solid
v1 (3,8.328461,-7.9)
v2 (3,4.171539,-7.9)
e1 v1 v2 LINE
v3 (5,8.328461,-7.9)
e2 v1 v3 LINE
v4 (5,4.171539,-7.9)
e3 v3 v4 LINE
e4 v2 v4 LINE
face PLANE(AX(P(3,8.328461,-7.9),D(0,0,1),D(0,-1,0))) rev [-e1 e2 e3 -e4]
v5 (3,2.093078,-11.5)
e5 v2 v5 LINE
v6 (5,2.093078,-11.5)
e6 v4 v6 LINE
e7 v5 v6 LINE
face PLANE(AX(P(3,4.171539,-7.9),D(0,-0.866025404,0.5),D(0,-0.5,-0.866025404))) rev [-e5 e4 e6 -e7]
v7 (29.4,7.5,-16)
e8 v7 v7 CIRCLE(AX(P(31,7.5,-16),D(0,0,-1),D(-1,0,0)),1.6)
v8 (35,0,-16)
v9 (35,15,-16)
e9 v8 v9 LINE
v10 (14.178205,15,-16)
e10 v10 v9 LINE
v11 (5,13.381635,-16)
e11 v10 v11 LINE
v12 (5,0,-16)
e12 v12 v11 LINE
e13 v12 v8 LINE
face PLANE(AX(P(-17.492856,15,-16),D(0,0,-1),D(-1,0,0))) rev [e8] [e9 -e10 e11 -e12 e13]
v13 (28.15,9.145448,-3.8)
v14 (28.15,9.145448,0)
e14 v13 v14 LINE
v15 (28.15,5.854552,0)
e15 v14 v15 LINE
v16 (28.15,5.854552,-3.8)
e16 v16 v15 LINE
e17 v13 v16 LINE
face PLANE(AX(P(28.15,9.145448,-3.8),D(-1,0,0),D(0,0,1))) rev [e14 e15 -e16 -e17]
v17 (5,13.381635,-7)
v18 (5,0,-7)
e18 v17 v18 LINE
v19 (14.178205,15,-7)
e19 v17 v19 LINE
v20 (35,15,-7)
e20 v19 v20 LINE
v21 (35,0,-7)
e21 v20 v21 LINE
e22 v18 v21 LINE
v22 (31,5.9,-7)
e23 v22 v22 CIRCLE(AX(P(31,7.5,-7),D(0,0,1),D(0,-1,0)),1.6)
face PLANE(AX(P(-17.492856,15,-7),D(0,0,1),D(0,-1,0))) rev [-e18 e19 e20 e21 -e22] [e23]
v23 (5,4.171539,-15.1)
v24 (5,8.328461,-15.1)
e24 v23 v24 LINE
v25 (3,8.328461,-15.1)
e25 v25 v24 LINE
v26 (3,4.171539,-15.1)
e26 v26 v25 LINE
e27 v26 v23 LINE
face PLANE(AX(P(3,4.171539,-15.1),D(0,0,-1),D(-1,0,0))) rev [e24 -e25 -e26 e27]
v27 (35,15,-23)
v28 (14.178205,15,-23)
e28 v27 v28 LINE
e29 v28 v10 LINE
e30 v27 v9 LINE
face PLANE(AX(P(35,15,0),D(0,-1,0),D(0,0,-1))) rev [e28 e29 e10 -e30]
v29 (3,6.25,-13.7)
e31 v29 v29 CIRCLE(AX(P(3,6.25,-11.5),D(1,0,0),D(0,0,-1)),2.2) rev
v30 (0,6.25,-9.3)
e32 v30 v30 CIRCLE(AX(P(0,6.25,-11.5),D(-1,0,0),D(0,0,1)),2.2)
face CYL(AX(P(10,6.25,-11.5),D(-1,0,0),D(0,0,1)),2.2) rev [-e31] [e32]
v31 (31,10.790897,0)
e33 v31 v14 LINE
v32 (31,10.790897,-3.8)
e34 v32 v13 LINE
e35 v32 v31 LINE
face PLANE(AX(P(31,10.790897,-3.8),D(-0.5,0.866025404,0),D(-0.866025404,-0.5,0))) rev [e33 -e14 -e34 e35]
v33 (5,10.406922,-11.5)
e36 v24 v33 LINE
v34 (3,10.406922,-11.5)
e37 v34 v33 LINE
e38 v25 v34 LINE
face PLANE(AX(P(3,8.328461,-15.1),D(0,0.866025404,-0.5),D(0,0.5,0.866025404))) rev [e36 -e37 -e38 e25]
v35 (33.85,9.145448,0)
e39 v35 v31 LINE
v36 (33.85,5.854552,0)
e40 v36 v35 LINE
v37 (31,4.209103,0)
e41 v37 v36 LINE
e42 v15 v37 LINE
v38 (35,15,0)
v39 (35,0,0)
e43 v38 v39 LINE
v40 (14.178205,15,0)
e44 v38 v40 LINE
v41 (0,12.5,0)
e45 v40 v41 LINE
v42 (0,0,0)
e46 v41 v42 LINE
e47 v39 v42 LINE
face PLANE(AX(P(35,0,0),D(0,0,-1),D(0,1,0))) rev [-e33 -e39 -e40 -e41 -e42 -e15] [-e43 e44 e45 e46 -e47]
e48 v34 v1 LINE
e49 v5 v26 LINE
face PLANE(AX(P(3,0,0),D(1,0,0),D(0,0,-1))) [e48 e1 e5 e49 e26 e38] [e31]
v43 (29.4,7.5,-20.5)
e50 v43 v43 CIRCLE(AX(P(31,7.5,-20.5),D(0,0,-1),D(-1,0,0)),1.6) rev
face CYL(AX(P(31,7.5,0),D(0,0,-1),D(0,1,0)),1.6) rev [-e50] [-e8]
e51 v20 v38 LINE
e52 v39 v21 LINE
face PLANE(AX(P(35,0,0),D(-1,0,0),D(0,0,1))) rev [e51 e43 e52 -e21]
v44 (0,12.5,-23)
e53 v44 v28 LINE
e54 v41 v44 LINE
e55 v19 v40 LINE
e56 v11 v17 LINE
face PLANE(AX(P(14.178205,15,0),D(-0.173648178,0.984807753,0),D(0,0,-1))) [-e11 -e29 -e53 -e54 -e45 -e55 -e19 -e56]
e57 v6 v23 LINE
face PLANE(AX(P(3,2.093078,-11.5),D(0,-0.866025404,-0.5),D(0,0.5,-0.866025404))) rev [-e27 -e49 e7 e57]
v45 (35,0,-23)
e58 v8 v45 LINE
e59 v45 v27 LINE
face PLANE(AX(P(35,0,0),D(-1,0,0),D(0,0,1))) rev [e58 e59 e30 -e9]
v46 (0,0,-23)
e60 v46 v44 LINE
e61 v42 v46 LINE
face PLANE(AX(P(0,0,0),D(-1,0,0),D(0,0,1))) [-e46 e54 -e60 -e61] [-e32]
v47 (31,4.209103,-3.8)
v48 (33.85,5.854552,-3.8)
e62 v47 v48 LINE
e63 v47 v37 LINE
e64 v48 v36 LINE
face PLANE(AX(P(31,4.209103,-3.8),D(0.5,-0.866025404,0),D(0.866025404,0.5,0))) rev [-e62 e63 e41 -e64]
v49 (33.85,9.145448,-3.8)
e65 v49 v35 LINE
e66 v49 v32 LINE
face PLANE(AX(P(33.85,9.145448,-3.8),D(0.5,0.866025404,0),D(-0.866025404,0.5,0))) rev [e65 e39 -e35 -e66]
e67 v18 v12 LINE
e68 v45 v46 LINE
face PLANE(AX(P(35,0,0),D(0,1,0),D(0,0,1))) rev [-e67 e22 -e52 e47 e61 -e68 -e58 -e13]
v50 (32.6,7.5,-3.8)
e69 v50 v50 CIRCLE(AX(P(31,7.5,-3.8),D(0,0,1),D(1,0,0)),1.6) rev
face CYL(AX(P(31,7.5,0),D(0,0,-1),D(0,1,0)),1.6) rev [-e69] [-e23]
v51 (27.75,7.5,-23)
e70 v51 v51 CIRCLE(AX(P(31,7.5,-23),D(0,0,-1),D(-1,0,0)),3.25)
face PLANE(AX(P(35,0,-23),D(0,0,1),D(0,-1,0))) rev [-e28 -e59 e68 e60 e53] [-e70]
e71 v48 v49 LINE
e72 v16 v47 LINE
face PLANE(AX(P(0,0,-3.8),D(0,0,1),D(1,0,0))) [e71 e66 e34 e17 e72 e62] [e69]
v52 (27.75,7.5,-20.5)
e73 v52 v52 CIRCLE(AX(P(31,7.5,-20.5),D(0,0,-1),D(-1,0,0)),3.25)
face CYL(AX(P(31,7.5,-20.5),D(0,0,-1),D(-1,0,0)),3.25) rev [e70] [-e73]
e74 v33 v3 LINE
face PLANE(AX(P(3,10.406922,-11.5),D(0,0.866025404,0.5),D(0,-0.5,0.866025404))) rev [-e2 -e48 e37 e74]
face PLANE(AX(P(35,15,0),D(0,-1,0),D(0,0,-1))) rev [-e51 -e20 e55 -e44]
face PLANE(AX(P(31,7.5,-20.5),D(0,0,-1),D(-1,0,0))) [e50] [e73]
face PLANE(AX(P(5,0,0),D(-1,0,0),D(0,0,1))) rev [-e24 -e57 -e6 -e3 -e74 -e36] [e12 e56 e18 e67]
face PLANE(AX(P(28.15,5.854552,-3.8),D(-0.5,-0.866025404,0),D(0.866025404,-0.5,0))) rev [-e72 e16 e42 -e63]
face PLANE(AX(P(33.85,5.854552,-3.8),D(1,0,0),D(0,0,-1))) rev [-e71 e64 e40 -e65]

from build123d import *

# Parameters (mm, degrees)
SKETCH1_W               = 23
SKETCH1_H               = 15
BOSS_EXTRUDE1_DEPTH     = 35
SKETCH2_W               = 9
SKETCH2_H               = 15
CUT_EXTRUDE1_DEPTH      = 30
CUT_EXTRUDE2_DEPTH      = 45.485952839
CUT_EXTRUDE2_DEPTH_BACK = 45.485952839
SKETCH3_R               = 1.6
CHAMFER1_SIZE           = 2.5
CHAMFER1_SIZE_2         = 14.178204549
SKETCH4_R               = 2.2
CUT_EXTRUDE3_DEPTH      = 10
CUT_EXTRUDE4_DEPTH      = 2
SKETCH6_R               = 3.25
CUT_EXTRUDE5_DEPTH      = 2.5
CUT_EXTRUDE6_DEPTH      = 3.8


with BuildPart() as part:
    # Sketch1 → Boss-Extrude1 (new body)
    with BuildSketch(Plane(origin=(0, 0, 0), x_dir=(0, 0, -1), z_dir=(1, 0, 0))):
        with Locations((11.5, 7.5)):
            Rectangle(SKETCH1_W, SKETCH1_H)
    extrude(amount=BOSS_EXTRUDE1_DEPTH)

    # Sketch2 → Cut-Extrude1 (cut)
    with BuildSketch(Plane(origin=(35, 0, 0), x_dir=(0, 0, -1), z_dir=(1, 0, 0))):
        with Locations((11.5, 7.5)):
            Rectangle(SKETCH2_W, SKETCH2_H)
    extrude(amount=-CUT_EXTRUDE1_DEPTH, mode=Mode.SUBTRACT)

    # Sketch3 → Cut-Extrude2 (cut, two sides: drawn at the far end of the back side and taken through both)
    with BuildSketch(Plane(origin=(0, 0, -23), x_dir=(-1, 0, 0), z_dir=(0, 0, -1)).offset(-CUT_EXTRUDE2_DEPTH_BACK)):
        with Locations(Location((-31, 7.5, 0), (0, 0, 90))):
            Circle(SKETCH3_R)
    extrude(amount=CUT_EXTRUDE2_DEPTH + CUT_EXTRUDE2_DEPTH_BACK, mode=Mode.SUBTRACT)

    # Chamfer1
    # the kernel refuses this chamfer: 14.178204549, 2.5 mm, written as the material it takes off along each edge
    with BuildSketch(Plane(origin=(0, 15, -59.842614584), x_dir=(-0.21013876076743537, -0.9776715712462578, 0), z_dir=(0, 0, 1))) as chamfer1_piece_1:
        Polygon((CHAMFER1_SIZE * 0.977671571246, CHAMFER1_SIZE * 0.210138760767), (-CHAMFER1_SIZE_2 * 0.210138760768, CHAMFER1_SIZE_2 * 0.977671571249), (0, 0), align=None)
    extrude(amount=96.685229169, mode=Mode.SUBTRACT)

    # Sketch4 → Cut-Extrude3 (cut)
    with BuildSketch(Plane.ZY):
        with Locations((-11.5, 6.25)):
            Circle(SKETCH4_R)
    extrude(amount=-CUT_EXTRUDE3_DEPTH, mode=Mode.SUBTRACT)

    # Sketch5 → Cut-Extrude4 (cut)
    with BuildSketch(Plane(origin=(5, 0, 0), x_dir=(0, 0, -1), z_dir=(1, 0, 0))):
        Polygon((7.9, 8.328460969), (7.9, 4.171539031), (11.5, 2.093078062), (15.1, 4.171539031), (15.1, 8.328460969), (11.5, 10.406921938), align=None)
    extrude(amount=-CUT_EXTRUDE4_DEPTH, mode=Mode.SUBTRACT)

    # Sketch6 → Cut-Extrude5 (cut)
    with BuildSketch(Plane(origin=(0, 0, -23), x_dir=(-1, 0, 0), z_dir=(0, 0, -1))):
        with Locations((-31, 7.5)):
            Circle(SKETCH6_R)
    extrude(amount=-CUT_EXTRUDE5_DEPTH, mode=Mode.SUBTRACT)

    # Sketch7 → Cut-Extrude6 (cut)
    with BuildSketch(Plane.XY):
        Polygon((28.15, 9.145448267), (28.15, 5.854551733), (31, 4.209103466), (33.85, 5.854551733), (33.85, 9.145448267), (31, 10.790896534), align=None)
    extrude(amount=-CUT_EXTRUDE6_DEPTH, mode=Mode.SUBTRACT)


solid = part.part
